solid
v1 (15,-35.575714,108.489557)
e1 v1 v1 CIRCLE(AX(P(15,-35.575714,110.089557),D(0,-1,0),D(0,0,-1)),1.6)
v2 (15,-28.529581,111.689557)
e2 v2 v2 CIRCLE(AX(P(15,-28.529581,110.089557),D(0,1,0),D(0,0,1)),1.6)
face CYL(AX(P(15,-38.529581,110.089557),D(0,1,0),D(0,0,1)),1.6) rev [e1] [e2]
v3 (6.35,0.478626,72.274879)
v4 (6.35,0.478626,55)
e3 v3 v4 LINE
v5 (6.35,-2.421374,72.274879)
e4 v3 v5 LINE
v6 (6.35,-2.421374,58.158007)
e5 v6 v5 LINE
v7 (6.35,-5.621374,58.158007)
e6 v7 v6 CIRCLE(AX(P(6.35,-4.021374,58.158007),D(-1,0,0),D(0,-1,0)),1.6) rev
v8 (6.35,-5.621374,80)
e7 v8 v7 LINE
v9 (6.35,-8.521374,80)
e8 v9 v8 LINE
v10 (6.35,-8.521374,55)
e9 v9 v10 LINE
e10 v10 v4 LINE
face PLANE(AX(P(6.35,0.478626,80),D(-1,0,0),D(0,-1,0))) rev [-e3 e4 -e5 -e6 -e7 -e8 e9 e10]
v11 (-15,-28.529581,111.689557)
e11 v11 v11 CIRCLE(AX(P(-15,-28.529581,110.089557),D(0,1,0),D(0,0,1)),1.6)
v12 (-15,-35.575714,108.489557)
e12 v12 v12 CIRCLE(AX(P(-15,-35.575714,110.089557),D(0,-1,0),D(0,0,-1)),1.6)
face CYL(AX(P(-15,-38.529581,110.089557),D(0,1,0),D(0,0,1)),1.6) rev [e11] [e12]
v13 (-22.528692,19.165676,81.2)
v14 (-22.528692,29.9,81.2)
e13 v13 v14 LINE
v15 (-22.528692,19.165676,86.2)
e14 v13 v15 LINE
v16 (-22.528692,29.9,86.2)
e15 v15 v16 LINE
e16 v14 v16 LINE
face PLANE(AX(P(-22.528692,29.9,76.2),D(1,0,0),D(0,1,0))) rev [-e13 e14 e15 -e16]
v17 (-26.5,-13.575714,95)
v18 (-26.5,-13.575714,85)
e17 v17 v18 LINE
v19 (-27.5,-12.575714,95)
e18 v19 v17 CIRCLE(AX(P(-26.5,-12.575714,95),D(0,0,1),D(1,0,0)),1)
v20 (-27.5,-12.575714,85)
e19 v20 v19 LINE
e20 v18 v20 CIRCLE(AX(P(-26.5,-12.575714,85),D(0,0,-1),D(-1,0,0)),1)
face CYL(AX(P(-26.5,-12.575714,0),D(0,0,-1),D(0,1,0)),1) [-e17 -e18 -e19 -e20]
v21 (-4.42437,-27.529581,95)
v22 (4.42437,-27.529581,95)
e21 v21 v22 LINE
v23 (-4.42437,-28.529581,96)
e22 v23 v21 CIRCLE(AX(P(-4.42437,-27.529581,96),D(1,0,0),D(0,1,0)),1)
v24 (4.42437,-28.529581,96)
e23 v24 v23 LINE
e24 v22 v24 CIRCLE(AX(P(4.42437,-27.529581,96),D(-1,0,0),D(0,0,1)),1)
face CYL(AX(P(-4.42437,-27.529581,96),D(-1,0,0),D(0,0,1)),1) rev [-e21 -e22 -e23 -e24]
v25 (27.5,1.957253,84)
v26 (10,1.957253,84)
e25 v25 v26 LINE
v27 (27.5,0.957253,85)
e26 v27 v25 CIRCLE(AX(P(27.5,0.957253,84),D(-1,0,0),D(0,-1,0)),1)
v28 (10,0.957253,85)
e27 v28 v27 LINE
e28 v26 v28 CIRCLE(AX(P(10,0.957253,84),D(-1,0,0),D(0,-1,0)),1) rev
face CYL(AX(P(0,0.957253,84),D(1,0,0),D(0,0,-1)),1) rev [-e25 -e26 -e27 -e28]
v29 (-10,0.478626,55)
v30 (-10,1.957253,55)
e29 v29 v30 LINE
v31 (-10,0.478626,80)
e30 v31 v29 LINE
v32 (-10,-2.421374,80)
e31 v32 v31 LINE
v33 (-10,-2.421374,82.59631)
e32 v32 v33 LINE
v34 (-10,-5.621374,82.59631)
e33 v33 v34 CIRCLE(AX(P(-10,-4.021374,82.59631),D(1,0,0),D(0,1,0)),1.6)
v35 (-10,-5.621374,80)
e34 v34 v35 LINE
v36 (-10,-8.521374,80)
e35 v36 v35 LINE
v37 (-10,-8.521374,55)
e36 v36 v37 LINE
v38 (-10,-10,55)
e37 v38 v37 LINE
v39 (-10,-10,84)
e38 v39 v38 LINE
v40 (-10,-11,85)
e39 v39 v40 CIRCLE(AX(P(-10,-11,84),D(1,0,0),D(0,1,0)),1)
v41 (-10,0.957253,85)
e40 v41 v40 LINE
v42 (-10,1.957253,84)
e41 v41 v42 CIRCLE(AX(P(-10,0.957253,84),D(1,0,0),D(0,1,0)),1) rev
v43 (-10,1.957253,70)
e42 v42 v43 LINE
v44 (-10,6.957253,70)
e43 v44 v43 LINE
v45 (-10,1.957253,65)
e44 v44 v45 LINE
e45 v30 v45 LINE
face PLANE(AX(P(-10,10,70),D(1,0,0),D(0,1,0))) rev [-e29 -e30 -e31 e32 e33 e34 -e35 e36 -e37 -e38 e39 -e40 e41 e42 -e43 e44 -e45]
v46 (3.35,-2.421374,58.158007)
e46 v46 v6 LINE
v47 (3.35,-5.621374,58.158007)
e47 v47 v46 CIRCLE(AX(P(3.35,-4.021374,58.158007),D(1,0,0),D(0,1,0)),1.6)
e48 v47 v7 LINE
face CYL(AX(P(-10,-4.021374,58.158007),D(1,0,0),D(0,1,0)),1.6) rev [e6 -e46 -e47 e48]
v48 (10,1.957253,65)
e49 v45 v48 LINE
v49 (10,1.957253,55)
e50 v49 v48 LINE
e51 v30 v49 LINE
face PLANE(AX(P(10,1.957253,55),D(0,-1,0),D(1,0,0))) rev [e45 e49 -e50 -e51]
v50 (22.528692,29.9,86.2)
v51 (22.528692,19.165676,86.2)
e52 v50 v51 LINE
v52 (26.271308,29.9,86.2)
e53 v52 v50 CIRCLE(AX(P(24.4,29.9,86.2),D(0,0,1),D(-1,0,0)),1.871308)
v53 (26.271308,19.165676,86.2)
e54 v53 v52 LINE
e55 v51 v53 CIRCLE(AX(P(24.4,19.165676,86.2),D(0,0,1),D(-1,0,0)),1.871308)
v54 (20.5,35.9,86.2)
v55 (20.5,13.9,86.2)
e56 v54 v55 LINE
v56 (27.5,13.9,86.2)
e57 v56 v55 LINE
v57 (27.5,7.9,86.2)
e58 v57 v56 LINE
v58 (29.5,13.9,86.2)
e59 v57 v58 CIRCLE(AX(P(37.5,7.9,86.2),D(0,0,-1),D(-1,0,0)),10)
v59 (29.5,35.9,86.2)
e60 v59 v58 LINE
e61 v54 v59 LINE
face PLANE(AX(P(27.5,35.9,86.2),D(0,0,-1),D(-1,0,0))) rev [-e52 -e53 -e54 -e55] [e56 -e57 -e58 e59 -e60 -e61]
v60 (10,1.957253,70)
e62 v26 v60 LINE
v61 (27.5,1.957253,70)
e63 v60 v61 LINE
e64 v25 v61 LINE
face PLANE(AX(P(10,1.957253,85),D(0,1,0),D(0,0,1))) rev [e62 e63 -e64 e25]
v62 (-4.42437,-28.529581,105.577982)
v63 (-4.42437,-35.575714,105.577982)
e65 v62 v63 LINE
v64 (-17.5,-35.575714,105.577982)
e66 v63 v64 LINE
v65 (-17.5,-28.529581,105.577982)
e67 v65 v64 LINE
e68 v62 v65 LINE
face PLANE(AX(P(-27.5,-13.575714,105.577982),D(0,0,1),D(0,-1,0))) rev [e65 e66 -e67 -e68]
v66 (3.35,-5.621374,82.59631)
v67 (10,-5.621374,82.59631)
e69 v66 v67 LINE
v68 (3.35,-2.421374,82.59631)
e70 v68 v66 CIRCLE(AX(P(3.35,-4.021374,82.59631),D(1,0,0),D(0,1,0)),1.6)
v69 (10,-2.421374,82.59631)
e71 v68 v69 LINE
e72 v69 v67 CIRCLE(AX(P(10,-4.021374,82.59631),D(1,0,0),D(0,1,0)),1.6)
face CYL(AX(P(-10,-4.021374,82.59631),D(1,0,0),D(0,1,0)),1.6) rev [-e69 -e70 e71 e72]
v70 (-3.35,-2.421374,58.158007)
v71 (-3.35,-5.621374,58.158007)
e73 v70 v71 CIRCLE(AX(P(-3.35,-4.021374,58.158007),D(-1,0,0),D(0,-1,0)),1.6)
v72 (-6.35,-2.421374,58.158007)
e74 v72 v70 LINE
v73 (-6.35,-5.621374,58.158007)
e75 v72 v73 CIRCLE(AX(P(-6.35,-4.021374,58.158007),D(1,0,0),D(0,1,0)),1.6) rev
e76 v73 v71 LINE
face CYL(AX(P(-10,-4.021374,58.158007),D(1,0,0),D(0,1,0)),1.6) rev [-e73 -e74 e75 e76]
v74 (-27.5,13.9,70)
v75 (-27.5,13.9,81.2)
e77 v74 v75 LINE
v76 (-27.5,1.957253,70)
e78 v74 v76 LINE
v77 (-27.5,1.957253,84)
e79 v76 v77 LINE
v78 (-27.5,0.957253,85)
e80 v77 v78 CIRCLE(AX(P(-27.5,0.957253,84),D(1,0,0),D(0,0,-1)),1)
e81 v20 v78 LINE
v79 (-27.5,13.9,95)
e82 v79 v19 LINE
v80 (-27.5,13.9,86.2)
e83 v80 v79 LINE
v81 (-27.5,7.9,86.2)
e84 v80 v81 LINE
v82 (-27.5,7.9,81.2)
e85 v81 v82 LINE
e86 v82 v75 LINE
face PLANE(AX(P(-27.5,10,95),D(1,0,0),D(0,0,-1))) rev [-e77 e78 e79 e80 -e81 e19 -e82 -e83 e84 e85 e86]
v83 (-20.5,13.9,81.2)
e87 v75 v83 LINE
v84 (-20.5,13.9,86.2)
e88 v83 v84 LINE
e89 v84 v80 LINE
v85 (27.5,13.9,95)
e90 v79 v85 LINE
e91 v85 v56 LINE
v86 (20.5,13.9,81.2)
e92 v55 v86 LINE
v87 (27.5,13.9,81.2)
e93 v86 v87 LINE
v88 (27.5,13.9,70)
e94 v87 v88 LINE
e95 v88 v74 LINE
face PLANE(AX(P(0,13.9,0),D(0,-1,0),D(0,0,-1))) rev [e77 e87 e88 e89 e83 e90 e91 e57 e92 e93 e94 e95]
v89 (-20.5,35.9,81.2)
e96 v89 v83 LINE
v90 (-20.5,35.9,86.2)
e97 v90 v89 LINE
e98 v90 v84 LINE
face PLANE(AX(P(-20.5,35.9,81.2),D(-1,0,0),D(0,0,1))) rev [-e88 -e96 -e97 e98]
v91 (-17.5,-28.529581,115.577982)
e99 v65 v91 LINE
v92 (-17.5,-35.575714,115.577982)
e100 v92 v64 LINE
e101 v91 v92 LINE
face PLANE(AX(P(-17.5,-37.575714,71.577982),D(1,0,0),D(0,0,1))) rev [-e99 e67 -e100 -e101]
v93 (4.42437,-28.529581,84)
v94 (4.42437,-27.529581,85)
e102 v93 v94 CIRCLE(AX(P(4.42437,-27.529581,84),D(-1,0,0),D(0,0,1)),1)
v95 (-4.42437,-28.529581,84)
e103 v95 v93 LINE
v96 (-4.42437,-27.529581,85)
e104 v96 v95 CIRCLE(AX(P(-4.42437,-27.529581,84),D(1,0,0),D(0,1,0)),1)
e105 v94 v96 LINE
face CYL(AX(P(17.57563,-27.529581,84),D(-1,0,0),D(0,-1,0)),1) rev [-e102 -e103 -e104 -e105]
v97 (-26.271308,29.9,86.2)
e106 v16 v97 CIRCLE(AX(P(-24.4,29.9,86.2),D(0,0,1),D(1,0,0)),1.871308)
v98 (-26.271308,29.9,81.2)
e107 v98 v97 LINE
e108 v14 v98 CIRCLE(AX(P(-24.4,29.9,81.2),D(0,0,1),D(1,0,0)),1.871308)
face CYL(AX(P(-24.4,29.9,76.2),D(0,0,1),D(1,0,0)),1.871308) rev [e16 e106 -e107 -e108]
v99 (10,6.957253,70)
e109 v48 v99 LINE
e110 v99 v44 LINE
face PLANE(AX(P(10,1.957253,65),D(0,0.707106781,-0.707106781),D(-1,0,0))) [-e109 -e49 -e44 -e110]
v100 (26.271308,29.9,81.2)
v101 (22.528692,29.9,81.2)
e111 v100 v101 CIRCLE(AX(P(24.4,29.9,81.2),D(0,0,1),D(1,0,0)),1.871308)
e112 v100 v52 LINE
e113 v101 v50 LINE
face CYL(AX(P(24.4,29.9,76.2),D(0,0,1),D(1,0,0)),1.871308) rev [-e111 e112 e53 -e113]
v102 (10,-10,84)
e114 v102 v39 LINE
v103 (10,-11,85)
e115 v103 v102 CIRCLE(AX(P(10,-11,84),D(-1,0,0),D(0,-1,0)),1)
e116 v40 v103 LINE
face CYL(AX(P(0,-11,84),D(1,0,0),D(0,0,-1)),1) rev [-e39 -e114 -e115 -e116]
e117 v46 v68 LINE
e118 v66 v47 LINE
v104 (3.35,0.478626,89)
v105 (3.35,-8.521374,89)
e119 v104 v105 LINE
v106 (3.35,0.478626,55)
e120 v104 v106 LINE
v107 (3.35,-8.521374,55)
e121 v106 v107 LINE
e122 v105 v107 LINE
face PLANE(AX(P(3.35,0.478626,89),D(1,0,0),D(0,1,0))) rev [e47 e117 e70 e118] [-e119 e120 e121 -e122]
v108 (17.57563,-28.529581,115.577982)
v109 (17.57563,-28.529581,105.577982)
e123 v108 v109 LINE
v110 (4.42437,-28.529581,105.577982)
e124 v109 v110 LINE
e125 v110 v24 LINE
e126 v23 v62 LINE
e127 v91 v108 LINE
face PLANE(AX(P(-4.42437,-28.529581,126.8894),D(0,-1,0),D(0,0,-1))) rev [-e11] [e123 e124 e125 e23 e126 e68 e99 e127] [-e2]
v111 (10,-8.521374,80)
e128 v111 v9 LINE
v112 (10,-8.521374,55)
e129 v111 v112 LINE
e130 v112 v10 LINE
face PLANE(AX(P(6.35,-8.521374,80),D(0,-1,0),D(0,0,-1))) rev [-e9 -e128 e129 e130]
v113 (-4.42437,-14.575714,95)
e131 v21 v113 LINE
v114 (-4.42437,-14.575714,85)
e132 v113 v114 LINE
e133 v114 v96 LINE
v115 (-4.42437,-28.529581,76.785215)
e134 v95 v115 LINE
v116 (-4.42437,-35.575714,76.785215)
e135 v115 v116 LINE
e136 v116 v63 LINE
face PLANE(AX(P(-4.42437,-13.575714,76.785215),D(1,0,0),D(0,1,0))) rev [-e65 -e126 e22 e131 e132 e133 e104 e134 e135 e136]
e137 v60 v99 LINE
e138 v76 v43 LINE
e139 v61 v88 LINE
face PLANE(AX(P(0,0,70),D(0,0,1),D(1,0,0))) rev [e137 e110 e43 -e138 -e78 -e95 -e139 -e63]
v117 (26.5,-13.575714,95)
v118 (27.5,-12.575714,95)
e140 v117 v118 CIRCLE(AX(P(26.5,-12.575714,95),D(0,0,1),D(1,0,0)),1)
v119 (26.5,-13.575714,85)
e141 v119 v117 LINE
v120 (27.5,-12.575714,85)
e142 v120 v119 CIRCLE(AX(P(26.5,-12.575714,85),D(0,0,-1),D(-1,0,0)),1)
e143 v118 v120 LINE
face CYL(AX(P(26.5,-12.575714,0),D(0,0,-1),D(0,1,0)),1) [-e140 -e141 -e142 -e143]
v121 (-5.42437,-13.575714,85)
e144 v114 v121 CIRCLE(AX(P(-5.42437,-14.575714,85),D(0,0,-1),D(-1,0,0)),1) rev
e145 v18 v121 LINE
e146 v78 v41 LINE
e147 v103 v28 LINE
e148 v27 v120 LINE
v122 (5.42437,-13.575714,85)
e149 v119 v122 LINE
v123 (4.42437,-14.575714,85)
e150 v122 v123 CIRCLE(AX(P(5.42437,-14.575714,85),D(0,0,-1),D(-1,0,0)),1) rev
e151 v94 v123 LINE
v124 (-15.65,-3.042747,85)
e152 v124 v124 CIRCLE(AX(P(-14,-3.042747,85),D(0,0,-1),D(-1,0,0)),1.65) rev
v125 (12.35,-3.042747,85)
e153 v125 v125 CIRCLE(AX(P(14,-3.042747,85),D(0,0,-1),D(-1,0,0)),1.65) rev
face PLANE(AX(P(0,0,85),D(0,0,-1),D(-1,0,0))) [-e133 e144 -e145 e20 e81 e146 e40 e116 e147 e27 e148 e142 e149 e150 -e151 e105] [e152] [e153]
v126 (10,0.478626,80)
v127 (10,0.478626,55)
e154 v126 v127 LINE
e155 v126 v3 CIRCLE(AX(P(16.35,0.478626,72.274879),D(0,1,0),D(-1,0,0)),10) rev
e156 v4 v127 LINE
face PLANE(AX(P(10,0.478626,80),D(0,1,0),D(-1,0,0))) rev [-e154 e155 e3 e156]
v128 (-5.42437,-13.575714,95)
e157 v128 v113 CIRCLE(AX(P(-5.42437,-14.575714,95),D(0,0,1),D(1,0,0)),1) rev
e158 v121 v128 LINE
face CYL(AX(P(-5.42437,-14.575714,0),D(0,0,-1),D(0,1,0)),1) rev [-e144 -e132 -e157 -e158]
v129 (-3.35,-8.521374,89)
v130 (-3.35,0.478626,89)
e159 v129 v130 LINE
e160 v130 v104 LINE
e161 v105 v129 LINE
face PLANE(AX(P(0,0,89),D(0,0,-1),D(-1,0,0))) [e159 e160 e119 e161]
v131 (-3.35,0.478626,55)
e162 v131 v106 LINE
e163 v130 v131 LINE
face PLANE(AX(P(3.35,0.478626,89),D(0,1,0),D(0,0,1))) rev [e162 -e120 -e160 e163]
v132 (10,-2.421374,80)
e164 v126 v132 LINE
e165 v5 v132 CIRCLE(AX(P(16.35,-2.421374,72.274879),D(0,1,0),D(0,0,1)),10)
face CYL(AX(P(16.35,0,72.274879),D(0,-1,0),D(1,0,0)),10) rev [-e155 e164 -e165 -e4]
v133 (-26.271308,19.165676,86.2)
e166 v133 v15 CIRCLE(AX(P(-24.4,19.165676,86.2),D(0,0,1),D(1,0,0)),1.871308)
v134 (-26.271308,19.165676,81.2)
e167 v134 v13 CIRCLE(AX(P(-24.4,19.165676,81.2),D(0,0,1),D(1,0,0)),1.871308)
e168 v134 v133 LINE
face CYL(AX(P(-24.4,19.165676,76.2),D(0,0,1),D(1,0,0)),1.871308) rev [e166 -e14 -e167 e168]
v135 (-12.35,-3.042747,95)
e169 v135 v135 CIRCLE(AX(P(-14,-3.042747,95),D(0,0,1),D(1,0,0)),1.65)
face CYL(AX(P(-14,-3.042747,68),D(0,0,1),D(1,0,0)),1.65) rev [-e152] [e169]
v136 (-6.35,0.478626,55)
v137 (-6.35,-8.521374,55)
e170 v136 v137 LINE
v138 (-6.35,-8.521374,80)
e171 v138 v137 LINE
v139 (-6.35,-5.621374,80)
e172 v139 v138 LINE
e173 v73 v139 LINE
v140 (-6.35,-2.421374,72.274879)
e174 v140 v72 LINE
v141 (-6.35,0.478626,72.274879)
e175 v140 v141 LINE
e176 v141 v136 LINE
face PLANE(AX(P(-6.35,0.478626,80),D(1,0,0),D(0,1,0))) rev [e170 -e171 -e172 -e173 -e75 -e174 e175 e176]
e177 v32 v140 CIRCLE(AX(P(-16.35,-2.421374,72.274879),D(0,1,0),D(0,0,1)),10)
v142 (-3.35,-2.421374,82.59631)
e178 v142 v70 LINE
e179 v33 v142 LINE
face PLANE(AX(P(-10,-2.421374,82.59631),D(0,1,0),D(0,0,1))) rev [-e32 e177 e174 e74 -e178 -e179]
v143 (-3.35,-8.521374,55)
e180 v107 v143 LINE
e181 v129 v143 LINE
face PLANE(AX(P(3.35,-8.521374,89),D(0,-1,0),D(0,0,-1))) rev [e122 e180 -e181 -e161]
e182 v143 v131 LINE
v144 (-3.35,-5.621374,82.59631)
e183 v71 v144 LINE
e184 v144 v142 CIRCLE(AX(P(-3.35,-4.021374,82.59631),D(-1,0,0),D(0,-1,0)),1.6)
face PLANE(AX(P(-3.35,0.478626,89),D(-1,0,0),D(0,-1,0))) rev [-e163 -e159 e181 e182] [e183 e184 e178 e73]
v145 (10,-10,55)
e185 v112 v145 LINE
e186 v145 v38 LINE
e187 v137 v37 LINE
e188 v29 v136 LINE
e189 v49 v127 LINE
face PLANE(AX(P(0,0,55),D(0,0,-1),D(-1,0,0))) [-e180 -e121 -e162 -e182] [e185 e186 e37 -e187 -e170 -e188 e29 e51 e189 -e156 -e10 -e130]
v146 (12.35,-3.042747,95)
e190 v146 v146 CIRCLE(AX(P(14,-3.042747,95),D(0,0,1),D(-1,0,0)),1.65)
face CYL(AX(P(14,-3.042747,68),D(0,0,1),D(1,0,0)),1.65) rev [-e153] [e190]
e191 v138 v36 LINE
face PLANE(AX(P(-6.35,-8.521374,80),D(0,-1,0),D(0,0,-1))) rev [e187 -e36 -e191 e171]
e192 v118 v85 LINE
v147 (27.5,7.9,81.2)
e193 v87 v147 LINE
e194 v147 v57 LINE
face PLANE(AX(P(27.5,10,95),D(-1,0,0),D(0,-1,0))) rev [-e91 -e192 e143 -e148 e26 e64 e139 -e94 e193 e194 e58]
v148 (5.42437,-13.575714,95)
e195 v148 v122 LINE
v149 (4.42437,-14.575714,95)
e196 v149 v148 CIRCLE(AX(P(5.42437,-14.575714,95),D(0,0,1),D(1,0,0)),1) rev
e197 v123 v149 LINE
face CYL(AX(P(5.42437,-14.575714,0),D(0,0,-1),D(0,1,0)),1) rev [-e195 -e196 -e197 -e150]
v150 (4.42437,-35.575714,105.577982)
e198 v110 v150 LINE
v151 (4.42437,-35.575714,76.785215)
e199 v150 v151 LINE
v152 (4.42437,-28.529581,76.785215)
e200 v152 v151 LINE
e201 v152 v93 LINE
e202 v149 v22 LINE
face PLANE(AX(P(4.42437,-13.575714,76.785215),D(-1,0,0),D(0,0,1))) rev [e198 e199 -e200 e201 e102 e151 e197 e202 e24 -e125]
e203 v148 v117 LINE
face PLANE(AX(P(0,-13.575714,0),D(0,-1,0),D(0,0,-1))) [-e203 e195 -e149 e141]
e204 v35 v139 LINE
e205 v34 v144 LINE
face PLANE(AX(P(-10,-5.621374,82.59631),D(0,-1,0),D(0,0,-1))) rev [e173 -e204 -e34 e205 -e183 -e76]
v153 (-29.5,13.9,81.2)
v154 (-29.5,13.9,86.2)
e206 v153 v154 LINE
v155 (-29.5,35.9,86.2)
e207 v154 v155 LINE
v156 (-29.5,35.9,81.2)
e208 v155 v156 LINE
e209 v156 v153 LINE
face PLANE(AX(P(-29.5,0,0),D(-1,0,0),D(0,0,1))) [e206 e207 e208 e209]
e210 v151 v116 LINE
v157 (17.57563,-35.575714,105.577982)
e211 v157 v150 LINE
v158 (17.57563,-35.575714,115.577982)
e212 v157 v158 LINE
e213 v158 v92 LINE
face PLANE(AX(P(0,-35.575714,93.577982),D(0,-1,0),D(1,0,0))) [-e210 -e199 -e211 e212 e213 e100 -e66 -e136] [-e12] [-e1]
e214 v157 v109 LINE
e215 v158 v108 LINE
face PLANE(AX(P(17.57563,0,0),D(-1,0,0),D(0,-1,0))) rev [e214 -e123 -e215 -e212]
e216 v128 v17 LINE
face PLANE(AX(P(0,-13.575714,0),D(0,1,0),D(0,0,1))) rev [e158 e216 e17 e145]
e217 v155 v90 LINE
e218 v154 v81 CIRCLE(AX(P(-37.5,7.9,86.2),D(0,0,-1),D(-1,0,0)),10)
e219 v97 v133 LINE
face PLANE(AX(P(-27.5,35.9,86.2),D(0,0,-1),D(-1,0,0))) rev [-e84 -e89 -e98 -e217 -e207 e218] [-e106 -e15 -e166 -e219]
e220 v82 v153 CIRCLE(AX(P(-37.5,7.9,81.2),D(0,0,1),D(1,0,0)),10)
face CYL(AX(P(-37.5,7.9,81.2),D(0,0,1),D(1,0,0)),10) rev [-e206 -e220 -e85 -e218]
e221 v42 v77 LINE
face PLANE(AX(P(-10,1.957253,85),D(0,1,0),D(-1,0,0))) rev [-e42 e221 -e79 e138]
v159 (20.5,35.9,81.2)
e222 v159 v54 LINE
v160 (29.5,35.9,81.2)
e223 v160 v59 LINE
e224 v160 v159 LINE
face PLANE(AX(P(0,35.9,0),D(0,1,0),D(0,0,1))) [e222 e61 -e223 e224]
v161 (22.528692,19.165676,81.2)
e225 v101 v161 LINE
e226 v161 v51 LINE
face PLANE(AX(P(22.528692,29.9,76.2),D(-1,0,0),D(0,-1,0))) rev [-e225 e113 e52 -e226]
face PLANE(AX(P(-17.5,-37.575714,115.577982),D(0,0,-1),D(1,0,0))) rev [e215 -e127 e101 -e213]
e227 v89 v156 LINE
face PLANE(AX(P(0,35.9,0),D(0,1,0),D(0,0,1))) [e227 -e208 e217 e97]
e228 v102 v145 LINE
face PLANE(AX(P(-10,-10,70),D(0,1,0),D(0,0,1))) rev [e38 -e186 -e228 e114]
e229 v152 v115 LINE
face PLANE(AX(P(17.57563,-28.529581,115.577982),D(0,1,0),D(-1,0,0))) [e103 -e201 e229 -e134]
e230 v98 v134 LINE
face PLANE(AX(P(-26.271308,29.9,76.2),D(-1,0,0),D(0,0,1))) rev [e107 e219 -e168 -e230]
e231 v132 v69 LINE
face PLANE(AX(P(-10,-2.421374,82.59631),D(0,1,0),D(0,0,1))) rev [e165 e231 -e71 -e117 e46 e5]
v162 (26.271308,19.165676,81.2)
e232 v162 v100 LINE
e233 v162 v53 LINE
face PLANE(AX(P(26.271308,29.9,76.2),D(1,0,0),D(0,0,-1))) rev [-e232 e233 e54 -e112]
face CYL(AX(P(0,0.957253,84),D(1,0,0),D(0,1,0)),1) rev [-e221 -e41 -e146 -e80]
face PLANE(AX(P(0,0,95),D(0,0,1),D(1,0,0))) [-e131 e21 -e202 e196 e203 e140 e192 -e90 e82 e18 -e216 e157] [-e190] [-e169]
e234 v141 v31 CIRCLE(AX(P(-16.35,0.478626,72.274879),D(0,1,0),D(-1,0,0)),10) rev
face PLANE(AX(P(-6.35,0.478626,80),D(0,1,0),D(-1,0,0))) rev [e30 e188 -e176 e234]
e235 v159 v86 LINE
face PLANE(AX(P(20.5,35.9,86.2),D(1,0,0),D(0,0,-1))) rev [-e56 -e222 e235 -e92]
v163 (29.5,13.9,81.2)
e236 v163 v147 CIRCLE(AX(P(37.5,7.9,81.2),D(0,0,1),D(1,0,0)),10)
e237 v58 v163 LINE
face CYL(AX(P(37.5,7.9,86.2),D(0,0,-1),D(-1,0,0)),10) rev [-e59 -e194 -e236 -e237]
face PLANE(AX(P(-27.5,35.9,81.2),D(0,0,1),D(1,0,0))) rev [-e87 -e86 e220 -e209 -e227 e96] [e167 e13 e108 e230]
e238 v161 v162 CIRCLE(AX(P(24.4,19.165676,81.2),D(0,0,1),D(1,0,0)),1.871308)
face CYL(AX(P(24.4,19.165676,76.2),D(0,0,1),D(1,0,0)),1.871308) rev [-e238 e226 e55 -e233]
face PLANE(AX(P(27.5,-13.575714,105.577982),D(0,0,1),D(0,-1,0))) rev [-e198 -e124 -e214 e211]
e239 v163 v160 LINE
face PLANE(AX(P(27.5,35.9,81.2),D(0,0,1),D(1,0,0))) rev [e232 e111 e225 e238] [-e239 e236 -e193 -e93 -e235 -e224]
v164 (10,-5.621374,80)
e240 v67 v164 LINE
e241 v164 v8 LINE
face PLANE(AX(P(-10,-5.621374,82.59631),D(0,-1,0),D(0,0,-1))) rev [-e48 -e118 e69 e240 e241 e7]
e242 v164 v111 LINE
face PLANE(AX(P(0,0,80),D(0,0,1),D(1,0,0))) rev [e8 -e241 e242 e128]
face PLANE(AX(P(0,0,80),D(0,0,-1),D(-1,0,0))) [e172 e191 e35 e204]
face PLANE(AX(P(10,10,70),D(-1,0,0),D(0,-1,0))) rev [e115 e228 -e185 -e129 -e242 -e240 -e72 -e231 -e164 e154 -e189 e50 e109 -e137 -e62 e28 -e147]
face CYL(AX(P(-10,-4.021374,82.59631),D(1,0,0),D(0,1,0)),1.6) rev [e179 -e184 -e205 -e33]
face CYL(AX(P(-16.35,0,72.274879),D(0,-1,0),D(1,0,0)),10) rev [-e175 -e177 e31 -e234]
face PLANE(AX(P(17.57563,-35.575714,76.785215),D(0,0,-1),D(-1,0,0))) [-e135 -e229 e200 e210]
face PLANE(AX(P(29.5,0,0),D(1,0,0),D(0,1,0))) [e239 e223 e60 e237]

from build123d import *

# Parameters (mm, degrees)
SKETCH_1_W            = 35
SKETCH_1_H            = 40
EXTRUDE_1_DEPTH       = 5
SKETCH_2_W            = 20
SKETCH_2_H            = 20
EXTRUDE_2_DEPTH       = 65
SKETCH_3_W            = 56
SKETCH_3_H            = 11
SKETCH_3_W_2          = 4.5
CUT_EXTRUDE_1_DEPTH   = 78.821912081
SKETCH_5_W            = 55
SKETCH_5_H            = 20
EXTRUDE_3_DEPTH       = 25
SKETCH_9_R            = 1.65
CUT_EXTRUDE_3_DEPTH   = 27
SKETCH_10_W           = 55
SKETCH_10_H           = 25
EXTRUDE_4_DEPTH       = 4.9
SKETCH_11_W           = 7
SKETCH_11_H           = 5
EXTRUDE_5_DEPTH       = 21
CHAMFER_2_SIZE        = 10
CHAMFER_3_SIZE        = 3
CHAMFER_4_SIZE        = 2
CUT_EXTRUDE_7_DEPTH   = 15
SKETCH_16_W           = 12.984556049
SKETCH_16_H           = 11
EXTRUDE_6_DEPTH       = 20
CHAMFER_5_SIZE        = 3
SKETCH_19_R           = 1.6
CUT_EXTRUDE_10_DEPTH  = 10
FILLET_1_R            = 5
SKETCH_20_W           = 5
SKETCH_20_H           = 22.5
EXTRUDE_7_DEPTH       = 17.5
SKETCH_21_W           = 5
SKETCH_21_H           = 22.5
EXTRUDE_8_DEPTH       = 5
SKETCH_22_W           = 5
SKETCH_22_H           = 22.5
EXTRUDE_9_DEPTH       = 10
SKETCH_23_W           = 5
SKETCH_23_H           = 22.5
EXTRUDE_10_DEPTH      = 10
SKETCH_24_W           = 3.3
SKETCH_24_H           = 22.5
EXTRUDE_11_DEPTH      = 4
SKETCH_26_W           = 5
SKETCH_26_H           = 22.5
EXTRUDE_13_DEPTH      = 17.5
SKETCH_27_W           = 5
SKETCH_27_H           = 22.5
EXTRUDE_14_DEPTH      = 5
SKETCH_28_W           = 5
SKETCH_28_H           = 22.5
EXTRUDE_15_DEPTH      = 10
SKETCH_29_W           = 5
SKETCH_29_H           = 22.5
EXTRUDE_16_DEPTH      = 10
SKETCH_31_W           = 3.4
SKETCH_31_H           = 22.5
EXTRUDE_18_DEPTH      = 4
SKETCH_39_W           = 7.13678645
SKETCH_39_H           = 13.518332953
SKETCH_39_W_2         = 8.139264071
SKETCH_39_H_2         = 10.52230198
CUT_EXTRUDE_17_DEPTH  = 35
SKETCH_40_W           = 55
SKETCH_40_H           = 10
EXTRUDE_20_DEPTH      = 25.575713879
SKETCH_41_W           = 8.84873954
SKETCH_41_H           = 7.046133319
EXTRUDE_21_DEPTH      = 20.577981656
EXTRUDE_22_DEPTH      = 13.07563
EXTRUDE_22_DEPTH_BACK = 22
SKETCH_42_W           = 38.79276714
SKETCH_42_H           = 7.046133319
SKETCH_43_W           = 23.07563023
SKETCH_43_H           = 28.79276714
CUT_EXTRUDE_18_DEPTH  = 22
FILLET_3_R            = 1
SKETCH_46_W           = 9.238205764
SKETCH_46_H           = 22.5
EXTRUDE_26_DEPTH      = 10
CUT_EXTRUDE_19_DEPTH  = 10
SKETCH_48_R           = 1.6
CUT_EXTRUDE_20_DEPTH  = 10
CUT_EXTRUDE_21_DEPTH  = 10
SKETCH_50_W           = 2.57104036
SKETCH_50_H           = 22.5
SKETCH_50_W_2         = 2.865096637
EXTRUDE_27_DEPTH      = 10
SKETCH_53_W           = 4.304606657
SKETCH_53_H           = 10
SKETCH_53_W_2         = 2.865096637
EXTRUDE_28_DEPTH      = 11
SKETCH_51_R           = 1.6
CUT_EXTRUDE_22_DEPTH  = 12
SKETCH_52_W           = 17.2
SKETCH_52_H           = 6.8
CUT_EXTRUDE_23_DEPTH  = 39
CUT_EXTRUDE_24_DEPTH  = 10
SKETCH_55_W           = 32
SKETCH_55_H           = 22.5
EXTRUDE_29_DEPTH      = 12
SKETCH_56_W           = 10.301119562
SKETCH_56_H           = 22.5
CUT_EXTRUDE_25_DEPTH  = 7
SKETCH_57_W           = 3
SKETCH_57_H           = 4.95
EXTRUDE_30_DEPTH      = 8
SKETCH_58_W           = 9
SKETCH_58_H           = 22.5
SKETCH_58_W_2         = 8.434386946
CUT_EXTRUDE_26_DEPTH  = 10.05
CUT_EXTRUDE_27_DEPTH  = 1
SKETCH_60_W           = 2.55
SKETCH_60_H           = 22.5
EXTRUDE_31_DEPTH      = 12
SKETCH_61_W           = 3.965384327
SKETCH_61_H           = 22.5
CUT_EXTRUDE_28_DEPTH  = 6.95
SKETCH_62_W           = 5
SKETCH_62_H           = 22
EXTRUDE_32_DEPTH      = 2
SKETCH_63_W           = 5
SKETCH_63_H           = 22
EXTRUDE_33_DEPTH      = 2
SKETCH_64_W           = 5
SKETCH_64_H           = 22.5
EXTRUDE_34_DEPTH      = 8
SKETCH_65_W           = 0.1
SKETCH_65_H           = 22.5
CUT_EXTRUDE_30_DEPTH  = 15
SKETCH_66_W           = 5
SKETCH_66_H           = 22.5
EXTRUDE_35_DEPTH      = 8
SKETCH_67_R           = 1.1
CUT_EXTRUDE_31_DEPTH  = 9
SKETCH_68_W           = 0.1
SKETCH_68_H           = 22.5
CUT_EXTRUDE_32_DEPTH  = 12
SKETCH_69_W           = 12
SKETCH_69_H           = 22.5
EXTRUDE_36_DEPTH      = 5
SKETCH_70_W           = 107.728068616
SKETCH_70_H           = 75.066227262
CUT_EXTRUDE_33_DEPTH  = 130
SKETCH_73_W           = 6.7
SKETCH_73_H           = 9
CUT_EXTRUDE_34_DEPTH  = 19
FILLET_5_R            = 10
SKETCH_75_W           = 20
SKETCH_75_H           = 11.957252994
SKETCH_75_W_2         = 6.7
SKETCH_75_H_2         = 9
EXTRUDE_38_DEPTH      = 15
CUT_EXTRUDE_35_DEPTH  = 20
SKETCH_76_W           = 3.65
SKETCH_76_H           = 9
CUT_EXTRUDE_36_DEPTH  = 25
FILLET_6_R            = 10
CHAMFER_6_SIZE        = 5


with BuildPart() as part:
    # 草图1 → 凸台-拉伸1 (new body)
    with BuildSketch(Plane.XY):
        Rectangle(SKETCH_1_W, SKETCH_1_H)
    extrude(amount=EXTRUDE_1_DEPTH)

    # 草图2 → 凸台-拉伸2 (add)
    with BuildSketch(Plane.XY.offset(5)):
        Rectangle(SKETCH_2_W, SKETCH_2_H)
    extrude(amount=EXTRUDE_2_DEPTH)

    # 草图3 → 切除-拉伸1 (cut, through all)
    with BuildSketch(Plane.ZY.offset(10)):
        with Locations((37.5, 0)):
            Rectangle(SKETCH_3_W, SKETCH_3_H)
        with Locations((7.25, 0)):
            Rectangle(SKETCH_3_W_2, SKETCH_3_H)
    extrude(amount=-CUT_EXTRUDE_1_DEPTH, mode=Mode.SUBTRACT)

    # 草图5 → 凸台-拉伸3 (add)
    with BuildSketch(Plane.XY.offset(70)):
        Rectangle(SKETCH_5_W, SKETCH_5_H)
    extrude(amount=EXTRUDE_3_DEPTH)

    # 草图9 → 切除-拉伸3 (cut)
    with BuildSketch(Plane.XY.offset(95)):
        with Locations((-14, -3.042747006)):
            Circle(SKETCH_9_R)
        with Locations((14, -3.042747006)):
            Circle(SKETCH_9_R)
    extrude(amount=-CUT_EXTRUDE_3_DEPTH, mode=Mode.SUBTRACT)

    # 草图10 → 凸台-拉伸4 (add)
    with BuildSketch(Plane(origin=(0, 10, 0), x_dir=(1, 0, 0), z_dir=(0, 1, 0))):
        with Locations((0, -82.5)):
            Rectangle(SKETCH_10_W, SKETCH_10_H)
    extrude(amount=EXTRUDE_4_DEPTH)

    # 草图11 → 凸台-拉伸5 (add)
    with BuildSketch(Plane(origin=(0, 14.9, 0), x_dir=(1, 0, 0), z_dir=(0, 1, 0))):
        with Locations((-24, -83.7)):
            Rectangle(SKETCH_11_W, SKETCH_11_H)
        with Locations((24, -83.7)):
            Rectangle(SKETCH_11_W, SKETCH_11_H)
    extrude(amount=EXTRUDE_5_DEPTH)

    # 倒角2
    chamfer_2_edges = [part.edges().sort_by_distance(p)[0] for p in [
        (0, -5.5, 65.5),
    ]]
    chamfer(chamfer_2_edges, length=CHAMFER_2_SIZE)

    # 倒角3
    chamfer_3_edges = [part.edges().sort_by_distance(p)[0] for p in [
        (0, 10, 70),
    ]]
    chamfer(chamfer_3_edges, length=CHAMFER_3_SIZE)

    # 倒角4
    chamfer_4_edges = [part.edges().sort_by_distance(p)[0] for p in [
        (0, -10, 5),
    ]]
    chamfer(chamfer_4_edges, length=CHAMFER_4_SIZE)

    # 草图15 → 切除-拉伸7 (cut)
    with BuildSketch(Plane(origin=(0, 0, 70), x_dir=(-1, 0, 0), z_dir=(0, 0, -1))):
        Polygon((10, 1.957252994), (29.13083687, 1.957252994), (29.13083687, -8.042747006), (29.13083687, -10), (10, -10), (10, -8.042747006), align=None)
        Polygon((-29.13083687, 1.957252994), (-29.13083687, -8.042747006), (-29.13083687, -10), (-10, -10), (-10, -8.042747006), (-10, 1.957252994), align=None)
    extrude(amount=-CUT_EXTRUDE_7_DEPTH, mode=Mode.SUBTRACT)

    # 草图16 → 凸台-拉伸6 (add)
    with BuildSketch(Plane.ZY.offset(10)):
        with Locations((11.492278025, 0)):
            Rectangle(SKETCH_16_W, SKETCH_16_H)
    extrude(amount=-EXTRUDE_6_DEPTH)

    # 倒角5
    chamfer_5_edges = [part.edges().sort_by_distance(p)[0] for p in [
        (0, 5.5, 17.984556049),
    ]]
    chamfer(chamfer_5_edges, length=CHAMFER_5_SIZE)

    # 草图19 → 切除-拉伸10 (cut)
    with BuildSketch(Plane.XY.offset(86.2)):
        with Locations((-24.4, 29.9)):
            Circle(SKETCH_19_R)
        with Locations((-24.4, 19.9)):
            Circle(SKETCH_19_R)
        with Locations((24.4, 19.9)):
            Circle(SKETCH_19_R)
        with Locations((24.4, 29.9)):
            Circle(SKETCH_19_R)
    extrude(amount=-CUT_EXTRUDE_10_DEPTH, mode=Mode.SUBTRACT)

    # 圆角1
    fillet_1_edges = [part.edges().sort_by_distance(p)[0] for p in [
        (17.5, -20, 2.5),
        (-17.5, -20, 2.5),
        (-17.5, 20, 2.5),
        (17.5, 20, 2.5),
    ]]
    fillet(fillet_1_edges, radius=FILLET_1_R)

    # 草图20 → 凸台-拉伸7 (add)
    with BuildSketch(Plane.ZY.offset(17.5)):
        with Locations((2.5, 0)):
            Rectangle(SKETCH_20_W, SKETCH_20_H)
    extrude(amount=EXTRUDE_7_DEPTH)

    # 草图21 → 凸台-拉伸8 (add)
    with BuildSketch(Plane.ZY.offset(35)):
        with Locations((2.5, 0)):
            Rectangle(SKETCH_21_W, SKETCH_21_H)
    extrude(amount=EXTRUDE_8_DEPTH)

    # 草图22 → 凸台-拉伸9 (add)
    with BuildSketch(Plane(origin=(0, 0, 0), x_dir=(-1, 0, 0), z_dir=(0, 0, -1))):
        with Locations((37.5, 0)):
            Rectangle(SKETCH_22_W, SKETCH_22_H)
    extrude(amount=EXTRUDE_9_DEPTH)

    # 草图23 → 凸台-拉伸10 (add)
    with BuildSketch(Plane(origin=(0, 0, 0), x_dir=(-1, 0, 0), z_dir=(0, 0, -1))):
        with Locations((15.5, 0)):
            Rectangle(SKETCH_23_W, SKETCH_23_H)
    extrude(amount=EXTRUDE_10_DEPTH)

    # 草图24 → 凸台-拉伸11 (add)
    with BuildSketch(Plane.ZY.offset(18)):
        with Locations((-8.35, 0)):
            Rectangle(SKETCH_24_W, SKETCH_24_H)
    extrude(amount=EXTRUDE_11_DEPTH)

    # 草图26 → 凸台-拉伸13 (add)
    with BuildSketch(Plane(origin=(17.5, 0, 0), x_dir=(0, 0, -1), z_dir=(1, 0, 0))):
        with Locations((-2.5, 0)):
            Rectangle(SKETCH_26_W, SKETCH_26_H)
    extrude(amount=EXTRUDE_13_DEPTH)

    # 草图27 → 凸台-拉伸14 (add)
    with BuildSketch(Plane(origin=(35, 0, 0), x_dir=(0, 0, -1), z_dir=(1, 0, 0))):
        with Locations((-2.5, 0)):
            Rectangle(SKETCH_27_W, SKETCH_27_H)
    extrude(amount=EXTRUDE_14_DEPTH)

    # 草图28 → 凸台-拉伸15 (add)
    with BuildSketch(Plane(origin=(0, 0, 0), x_dir=(-1, 0, 0), z_dir=(0, 0, -1))):
        with Locations((-37.5, 0)):
            Rectangle(SKETCH_28_W, SKETCH_28_H)
    extrude(amount=EXTRUDE_15_DEPTH)

    # 草图29 → 凸台-拉伸16 (add)
    with BuildSketch(Plane(origin=(0, 0, 0), x_dir=(-1, 0, 0), z_dir=(0, 0, -1))):
        with Locations((-15.5, 0)):
            Rectangle(SKETCH_29_W, SKETCH_29_H)
    extrude(amount=EXTRUDE_16_DEPTH)

    # 草图31 → 凸台-拉伸18 (add)
    with BuildSketch(Plane(origin=(18, 0, 0), x_dir=(0, 0, -1), z_dir=(1, 0, 0))):
        with Locations((8.3, 0)):
            Rectangle(SKETCH_31_W, SKETCH_31_H)
    extrude(amount=EXTRUDE_18_DEPTH)

    # 草图39 → 切除-拉伸17 (cut)
    with BuildSketch(Plane.ZY.offset(17.5)):
        with Locations((3.568393225, 18.009166476)):
            Rectangle(SKETCH_39_W, SKETCH_39_H)
        with Locations((4.069632036, -16.51115099)):
            Rectangle(SKETCH_39_W_2, SKETCH_39_H_2)
    extrude(amount=-CUT_EXTRUDE_17_DEPTH, mode=Mode.SUBTRACT)

    # 草图40 → 凸台-拉伸20 (add)
    with BuildSketch(Plane.XZ.offset(10)):
        with Locations((0, 90)):
            Rectangle(SKETCH_40_W, SKETCH_40_H)
    extrude(amount=EXTRUDE_20_DEPTH)

    # 草图41 → 凸台-拉伸21 (add)
    with BuildSketch(Plane.XY.offset(95)):
        with Locations((0, -32.05264722)):
            Rectangle(SKETCH_41_W, SKETCH_41_H)
    extrude(amount=EXTRUDE_21_DEPTH)

    # 草图42 → 凸台-拉伸22 (add, two sides: drawn at the far end of the back side and taken through both)
    with BuildSketch(Plane.ZY.offset(4.42436977).offset(-EXTRUDE_22_DEPTH_BACK)):
        with Locations((96.181598086, -32.05264722)):
            Rectangle(SKETCH_42_W, SKETCH_42_H)
    extrude(amount=EXTRUDE_22_DEPTH + EXTRUDE_22_DEPTH_BACK)

    # 草图43 → 切除-拉伸18 (cut)
    with BuildSketch(Plane.XZ.offset(35.575713879)):
        with Locations((15.962184885, 91.181598086)):
            Rectangle(SKETCH_43_W, SKETCH_43_H)
        with Locations((-15.962184885, 91.181598086)):
            Rectangle(SKETCH_43_W, SKETCH_43_H)
    extrude(amount=-CUT_EXTRUDE_18_DEPTH, mode=Mode.SUBTRACT)

    # 圆角3
    fillet_3_edges = [part.edges().sort_by_distance(p)[0] for p in [
        (-18.75, 1.957252994, 85),
        (18.75, 1.957252994, 85),
        (0, -10, 85),
        (0, -28.52958056, 85),
        (0, -28.52958056, 95),
        (27.5, -13.575713879, 90),
        (4.42436977, -13.575713879, 90),
        (-27.5, -13.575713879, 90),
        (-4.42436977, -13.575713879, 90),
    ]]
    fillet(fillet_3_edges, radius=FILLET_3_R)

    # 草图46 → 凸台-拉伸26 (add)
    with BuildSketch(Plane(origin=(0, 0, 0), x_dir=(-1, 0, 0), z_dir=(0, 0, -1))):
        with Locations((-8.380897118, 0)):
            Rectangle(SKETCH_46_W, SKETCH_46_H)
    extrude(amount=EXTRUDE_26_DEPTH)

    # 草图47 → 切除-拉伸19 (cut)
    with BuildSketch(Plane(origin=(0, 0, -10), x_dir=(-1, 0, 0), z_dir=(0, 0, -1))):
        with BuildLine():
            Line((-8.066400893, 11.25), (-10.700516417, 11.25))
            Line((-10.700516417, 11.25), (-10.700516417, -11.25))
            Line((-10.700516417, -11.25), (-6.332834596, -11.25))
            ThreePointArc((-6.332834596, -11.25), (-6.663682414, -9.62836823), (-8.066400893, -8.75))
            Line((-8.066400893, -8.75), (-8.066400893, -7.900028072))
            ThreePointArc((-8.066400893, -7.900028072), (-6.289381928, -5.825014036), (-8.066400893, -3.75))
            Line((-8.066400893, -3.75), (-8.066400893, -2.900028072))
            ThreePointArc((-8.066400893, -2.900028072), (-6.289381928, -0.825014036), (-8.066400893, 1.25))
            Line((-8.066400893, 1.25), (-8.066400893, 2.099971928))
            ThreePointArc((-8.066400893, 2.099971928), (-6.289381928, 4.174985964), (-8.066400893, 6.25))
            Line((-8.066400893, 6.25), (-8.066400893, 7.099971928))
            ThreePointArc((-8.066400893, 7.099971928), (-6.289381928, 9.174985964), (-8.066400893, 11.25))
        make_face()
    extrude(amount=-CUT_EXTRUDE_19_DEPTH, mode=Mode.SUBTRACT)

    # 草图48 → 切除-拉伸20 (cut)
    with BuildSketch(Plane(origin=(0, -28.52958056, 0), x_dir=(1, 0, 0), z_dir=(0, 1, 0))):
        with Locations(Location((15, -110.089556655, 0), (0, 0, 270))):
            Circle(SKETCH_48_R)
        with Locations(Location((-15, -110.089556655, 0), (0, 0, 270))):
            Circle(SKETCH_48_R)
    extrude(amount=-CUT_EXTRUDE_20_DEPTH, mode=Mode.SUBTRACT)

    # 草图49 → 切除-拉伸21 (cut)
    with BuildSketch(Plane.XY.offset(86.2)):
        with BuildLine():
            Line((-22.528691915, 29.9), (-22.528691915, 19.165676086))
            ThreePointArc((-22.528691915, 19.165676086), (-24.4, 17.294368), (-26.271308085, 19.165676086))
            Line((-26.271308085, 19.165676086), (-26.271308085, 29.9))
            ThreePointArc((-26.271308085, 29.9), (-24.4, 31.771308085), (-22.528691915, 29.9))
        make_face()
        with BuildLine():
            Line((22.528691915, 29.9), (22.528691915, 19.165676086))
            ThreePointArc((22.528691915, 19.165676086), (24.4, 17.294368), (26.271308085, 19.165676086))
            Line((26.271308085, 19.165676086), (26.271308085, 29.9))
            ThreePointArc((26.271308085, 29.9), (24.4, 31.771308085), (22.528691915, 29.9))
        make_face()
    extrude(amount=-CUT_EXTRUDE_21_DEPTH, mode=Mode.SUBTRACT)

    # 草图50 → 凸台-拉伸27 (add)
    with BuildSketch(Plane(origin=(0, 0, -10), x_dir=(-1, 0, 0), z_dir=(0, 0, -1))):
        with Locations((-5.047314416, 0)):
            Rectangle(SKETCH_50_W, SKETCH_50_H)
        with Locations((-12.133064736, 0)):
            Rectangle(SKETCH_50_W_2, SKETCH_50_H)
    extrude(amount=EXTRUDE_27_DEPTH)

    # 草图53 → 凸台-拉伸28 (add)
    with BuildSketch(Plane(origin=(0, 11.25, 0), x_dir=(1, 0, 0), z_dir=(0, 1, 0))):
        with Locations((5.914097565, 5)):
            Rectangle(SKETCH_53_W, SKETCH_53_H)
        with Locations((12.133064736, 5)):
            Rectangle(SKETCH_53_W_2, SKETCH_53_H)
    extrude(amount=EXTRUDE_28_DEPTH)

    # 草图51 → 切除-拉伸22 (cut)
    with BuildSketch(Plane(origin=(13.565613054, 0, 0), x_dir=(0, 0, -1), z_dir=(1, 0, 0))):
        with Locations((16, 6.25)):
            Circle(SKETCH_51_R)
        with Locations((16, -6.25)):
            Circle(SKETCH_51_R)
    extrude(amount=-CUT_EXTRUDE_22_DEPTH, mode=Mode.SUBTRACT)

    # 草图52 → 切除-拉伸23 (cut)
    with BuildSketch(Plane(origin=(0, 11.25, 0), x_dir=(1, 0, 0), z_dir=(0, 1, 0))):
        with Locations((-26.5, 3.35)):
            Rectangle(SKETCH_52_W, SKETCH_52_H)
        with Locations((26.5, 3.35)):
            Rectangle(SKETCH_52_W, SKETCH_52_H)
    extrude(amount=-CUT_EXTRUDE_23_DEPTH, mode=Mode.SUBTRACT)

    # 草图54 → 切除-拉伸24 (cut)
    with BuildSketch(Plane(origin=(0, 0, -10), x_dir=(-1, 0, 0), z_dir=(0, 0, -1))):
        with BuildLine():
            ThreePointArc((-8.066400893, 12.099971928), (-6.289381928, 14.174985964), (-8.066400893, 16.25))
            Line((-8.066400893, 16.25), (-8.066400893, 12.099971928))
        make_face()
        with BuildLine():
            ThreePointArc((-8.066400893, 17.099971928), (-6.289381928, 19.174985964), (-8.066400893, 21.25))
            Line((-8.066400893, 21.25), (-8.066400893, 17.099971928))
        make_face()
    extrude(amount=-CUT_EXTRUDE_24_DEPTH, mode=Mode.SUBTRACT)

    # 草图55 → 凸台-拉伸29 (add)
    with BuildSketch(Plane.XY.offset(5)):
        Rectangle(SKETCH_55_W, SKETCH_55_H)
    extrude(amount=EXTRUDE_29_DEPTH)

    # 草图56 → 切除-拉伸25 (cut)
    with BuildSketch(Plane(origin=(0, 0, 0), x_dir=(-1, 0, 0), z_dir=(0, 0, -1))):
        with Locations((7.849440219, 0)):
            Rectangle(SKETCH_56_W, SKETCH_56_H)
    extrude(amount=-CUT_EXTRUDE_25_DEPTH, mode=Mode.SUBTRACT)

    # 草图57 → 凸台-拉伸30 (add)
    with BuildSketch(Plane(origin=(0, 11.25, 0), x_dir=(1, 0, 0), z_dir=(0, 1, 0))):
        with Locations((-18.465384327, -2.525)):
            Rectangle(SKETCH_57_W, SKETCH_57_H)
        with Locations((-34.665384327, -2.525)):
            Rectangle(SKETCH_57_W, SKETCH_57_H)
    extrude(amount=EXTRUDE_30_DEPTH)

    # 草图58 → 切除-拉伸26 (cut)
    with BuildSketch(Plane(origin=(0, 0, -10), x_dir=(-1, 0, 0), z_dir=(0, 0, -1))):
        with Locations((17.5, 0)):
            Rectangle(SKETCH_58_W, SKETCH_58_H)
        with Locations((-17.782806527, 0)):
            Rectangle(SKETCH_58_W_2, SKETCH_58_H)
    extrude(amount=-CUT_EXTRUDE_26_DEPTH, mode=Mode.SUBTRACT)

    # 草图59 → 切除-拉伸27 (cut)
    with BuildSketch(Plane(origin=(0, 14.9, 0), x_dir=(1, 0, 0), z_dir=(0, 1, 0))):
        Polygon((20.5, -86.2), (20.5, -81.2), (27.5, -81.2), (27.5, -70), (-27.5, -70), (-27.5, -81.2), (-20.5, -81.2), (-20.5, -86.2), (-27.5, -86.2), (-27.5, -95), (27.5, -95), (27.5, -86.2), align=None)
    extrude(amount=-CUT_EXTRUDE_27_DEPTH, mode=Mode.SUBTRACT)

    # 草图60 → 凸台-拉伸31 (add)
    with BuildSketch(Plane.XY.offset(5)):
        with Locations((-17.275, 0)):
            Rectangle(SKETCH_60_W, SKETCH_60_H)
        with Locations((17.275, 0)):
            Rectangle(SKETCH_60_W, SKETCH_60_H)
    extrude(amount=EXTRUDE_31_DEPTH)

    # 草图61 → 切除-拉伸28 (cut)
    with BuildSketch(Plane(origin=(0, 0, 0.05), x_dir=(-1, 0, 0), z_dir=(0, 0, -1))):
        with Locations((14.982692164, 0)):
            Rectangle(SKETCH_61_W, SKETCH_61_H)
    extrude(amount=-CUT_EXTRUDE_28_DEPTH, mode=Mode.SUBTRACT)

    # 草图62 → 凸台-拉伸32 (add)
    with BuildSketch(Plane.ZY.offset(27.5)):
        with Locations((83.7, 24.9)):
            Rectangle(SKETCH_62_W, SKETCH_62_H)
    extrude(amount=EXTRUDE_32_DEPTH)

    # 草图63 → 凸台-拉伸33 (add)
    with BuildSketch(Plane(origin=(27.5, 0, 0), x_dir=(0, 0, -1), z_dir=(1, 0, 0))):
        with Locations((-83.7, 24.9)):
            Rectangle(SKETCH_63_W, SKETCH_63_H)
    extrude(amount=EXTRUDE_33_DEPTH)

    # 草图64 → 凸台-拉伸34 (add)
    with BuildSketch(Plane(origin=(0, 0, -10), x_dir=(-1, 0, 0), z_dir=(0, 0, -1))):
        with Locations((-37.5, 0)):
            Rectangle(SKETCH_64_W, SKETCH_64_H)
    extrude(amount=EXTRUDE_34_DEPTH)

    # 草图65 → 切除-拉伸30 (cut)
    with BuildSketch(Plane(origin=(0, 0, -18), x_dir=(-1, 0, 0), z_dir=(0, 0, -1))):
        with Locations((-35.05, 0)):
            Rectangle(SKETCH_65_W, SKETCH_65_H)
    extrude(amount=-CUT_EXTRUDE_30_DEPTH, mode=Mode.SUBTRACT)

    # 草图66 → 凸台-拉伸35 (add)
    with BuildSketch(Plane(origin=(0, 0, -10), x_dir=(-1, 0, 0), z_dir=(0, 0, -1))):
        with Locations((37.5, 0)):
            Rectangle(SKETCH_66_W, SKETCH_66_H)
    extrude(amount=EXTRUDE_35_DEPTH)

    # 草图67 → 切除-拉伸31 (cut)
    with BuildSketch(Plane(origin=(40, 0, 0), x_dir=(0, 0, -1), z_dir=(1, 0, 0))):
        with Locations(Location((2.45, 4.25, 0), (0, 0, 90))):
            Circle(SKETCH_67_R)
        with Locations(Location((2.45, -3.75, 0), (0, 0, 90))):
            Circle(SKETCH_67_R)
        with Locations(Location((14.45, -3.75, 0), (0, 0, 90))):
            Circle(SKETCH_67_R)
        with Locations(Location((14.45, 4.25, 0), (0, 0, 90))):
            Circle(SKETCH_67_R)
    cut_extrude_31 = extrude(amount=-CUT_EXTRUDE_31_DEPTH, mode=Mode.SUBTRACT)

    # 镜向1: 切除-拉伸31 across plane
    add(cut_extrude_31.mirror(Plane(origin=(0, 0, 0), x_dir=(0, 0, 1), z_dir=(1, 0, 0))), mode=Mode.SUBTRACT)

    # 草图68 → 切除-拉伸32 (cut)
    with BuildSketch(Plane(origin=(0, 0, -18), x_dir=(-1, 0, 0), z_dir=(0, 0, -1))):
        with Locations((35.05, 0)):
            Rectangle(SKETCH_68_W, SKETCH_68_H)
    extrude(amount=-CUT_EXTRUDE_32_DEPTH, mode=Mode.SUBTRACT)

    # 草图69 → 凸台-拉伸36 (add)
    with BuildSketch(Plane.ZY.offset(18.55)):
        with Locations((11, 0)):
            Rectangle(SKETCH_69_W, SKETCH_69_H)
    extrude(amount=EXTRUDE_36_DEPTH)

    # 草图70 → 切除-拉伸33 (cut)
    with BuildSketch(Plane(origin=(0, 0, 70), x_dir=(-1, 0, 0), z_dir=(0, 0, -1))):
        Rectangle(SKETCH_70_W, SKETCH_70_H)
    extrude(amount=CUT_EXTRUDE_33_DEPTH, mode=Mode.SUBTRACT)

    # 草图73 → 切除-拉伸34 (cut)
    with BuildSketch(Plane(origin=(0, 0, 70), x_dir=(-1, 0, 0), z_dir=(0, 0, -1))):
        with Locations((0, -4.021373503)):
            Rectangle(SKETCH_73_W, SKETCH_73_H)
    extrude(amount=-CUT_EXTRUDE_34_DEPTH, mode=Mode.SUBTRACT)

    # 圆角5
    # the kernel refuses this fillet: 10 mm, written as the material it adds along each edge
    with BuildSketch(Plane(origin=(-27.5, 13.9, 86.2), x_dir=(0, -1, 0), z_dir=(0, 0, -1)), Plane(origin=(27.5, 13.9, 81.2), x_dir=(0, -1, 0), z_dir=(0, 0, 1))) as fillet_5_piece_1:
        with BuildLine():
            CenterArc((6, 10), FILLET_5_R, 233.130102354, 36.869897646)
            Line((0, 2), (0, 0))
            Line((0, 0), (6, 0))
        make_face()
    extrude(amount=5)

    # 草图75 → 凸台-拉伸38 (add)
    with BuildSketch(Plane(origin=(0, 0, 70), x_dir=(-1, 0, 0), z_dir=(0, 0, -1))):
        with Locations((0, -4.021373503)):
            Rectangle(SKETCH_75_W, SKETCH_75_H)
        with Locations((0, -4.021373503)):
            Rectangle(SKETCH_75_W_2, SKETCH_75_H_2, mode=Mode.SUBTRACT)
    extrude(amount=EXTRUDE_38_DEPTH)

    # 草图74 → 切除-拉伸35 (cut)
    with BuildSketch(Plane(origin=(10, 0, 0), x_dir=(0, 0, -1), z_dir=(1, 0, 0))):
        with BuildLine():
            Line((-82.596309624, -2.421373503), (-58.15800679, -2.421373503))
            ThreePointArc((-58.15800679, -2.421373503), (-56.55800679, -4.021373503), (-58.15800679, -5.621373503))
            Line((-58.15800679, -5.621373503), (-82.596309624, -5.621373503))
            ThreePointArc((-82.596309624, -5.621373503), (-84.196309624, -4.021373503), (-82.596309624, -2.421373503))
        make_face()
    extrude(amount=-CUT_EXTRUDE_35_DEPTH, mode=Mode.SUBTRACT)

    # 草图76 → 切除-拉伸36 (cut)
    with BuildSketch(Plane(origin=(0, 0, 55), x_dir=(-1, 0, 0), z_dir=(0, 0, -1))):
        with Locations((-8.175, -4.021373503)):
            Rectangle(SKETCH_76_W, SKETCH_76_H)
        with Locations((8.175, -4.021373503)):
            Rectangle(SKETCH_76_W, SKETCH_76_H)
    extrude(amount=-CUT_EXTRUDE_36_DEPTH, mode=Mode.SUBTRACT)

    # 圆角6
    # the kernel refuses this fillet: 10 mm, written as the material it adds along each edge
    with BuildSketch(Plane(origin=(-6.35, 0.478626497, 80), x_dir=(-1, 0, 0), z_dir=(0, -1, 0))) as fillet_6_piece_1:
        with BuildLine():
            CenterArc((10, 7.725121358), FILLET_6_R, 180, 50.580015533)
            Line((0, 7.725121358), (0, 0))
            Line((0, 0), (3.65, 0))
        make_face()
    extrude(amount=2.9)
    with BuildSketch(Plane(origin=(6.35, 0.478626497, 80), x_dir=(1, 0, 0), z_dir=(0, -1, 0))) as fillet_6_piece_2:
        with BuildLine():
            CenterArc((10, -7.725121358), FILLET_6_R, 129.419984467, 50.580015533)
            Line((0, -7.725121358), (0, 0))
            Line((0, 0), (3.65, 0))
        make_face()
    extrude(amount=2.9)

    # 倒角6
    chamfer_6_edges = [part.edges().sort_by_distance(p)[0] for p in [
        (0, 1.957252994, 70),
    ]]
    chamfer(chamfer_6_edges, length=CHAMFER_6_SIZE)


solid = part.part
